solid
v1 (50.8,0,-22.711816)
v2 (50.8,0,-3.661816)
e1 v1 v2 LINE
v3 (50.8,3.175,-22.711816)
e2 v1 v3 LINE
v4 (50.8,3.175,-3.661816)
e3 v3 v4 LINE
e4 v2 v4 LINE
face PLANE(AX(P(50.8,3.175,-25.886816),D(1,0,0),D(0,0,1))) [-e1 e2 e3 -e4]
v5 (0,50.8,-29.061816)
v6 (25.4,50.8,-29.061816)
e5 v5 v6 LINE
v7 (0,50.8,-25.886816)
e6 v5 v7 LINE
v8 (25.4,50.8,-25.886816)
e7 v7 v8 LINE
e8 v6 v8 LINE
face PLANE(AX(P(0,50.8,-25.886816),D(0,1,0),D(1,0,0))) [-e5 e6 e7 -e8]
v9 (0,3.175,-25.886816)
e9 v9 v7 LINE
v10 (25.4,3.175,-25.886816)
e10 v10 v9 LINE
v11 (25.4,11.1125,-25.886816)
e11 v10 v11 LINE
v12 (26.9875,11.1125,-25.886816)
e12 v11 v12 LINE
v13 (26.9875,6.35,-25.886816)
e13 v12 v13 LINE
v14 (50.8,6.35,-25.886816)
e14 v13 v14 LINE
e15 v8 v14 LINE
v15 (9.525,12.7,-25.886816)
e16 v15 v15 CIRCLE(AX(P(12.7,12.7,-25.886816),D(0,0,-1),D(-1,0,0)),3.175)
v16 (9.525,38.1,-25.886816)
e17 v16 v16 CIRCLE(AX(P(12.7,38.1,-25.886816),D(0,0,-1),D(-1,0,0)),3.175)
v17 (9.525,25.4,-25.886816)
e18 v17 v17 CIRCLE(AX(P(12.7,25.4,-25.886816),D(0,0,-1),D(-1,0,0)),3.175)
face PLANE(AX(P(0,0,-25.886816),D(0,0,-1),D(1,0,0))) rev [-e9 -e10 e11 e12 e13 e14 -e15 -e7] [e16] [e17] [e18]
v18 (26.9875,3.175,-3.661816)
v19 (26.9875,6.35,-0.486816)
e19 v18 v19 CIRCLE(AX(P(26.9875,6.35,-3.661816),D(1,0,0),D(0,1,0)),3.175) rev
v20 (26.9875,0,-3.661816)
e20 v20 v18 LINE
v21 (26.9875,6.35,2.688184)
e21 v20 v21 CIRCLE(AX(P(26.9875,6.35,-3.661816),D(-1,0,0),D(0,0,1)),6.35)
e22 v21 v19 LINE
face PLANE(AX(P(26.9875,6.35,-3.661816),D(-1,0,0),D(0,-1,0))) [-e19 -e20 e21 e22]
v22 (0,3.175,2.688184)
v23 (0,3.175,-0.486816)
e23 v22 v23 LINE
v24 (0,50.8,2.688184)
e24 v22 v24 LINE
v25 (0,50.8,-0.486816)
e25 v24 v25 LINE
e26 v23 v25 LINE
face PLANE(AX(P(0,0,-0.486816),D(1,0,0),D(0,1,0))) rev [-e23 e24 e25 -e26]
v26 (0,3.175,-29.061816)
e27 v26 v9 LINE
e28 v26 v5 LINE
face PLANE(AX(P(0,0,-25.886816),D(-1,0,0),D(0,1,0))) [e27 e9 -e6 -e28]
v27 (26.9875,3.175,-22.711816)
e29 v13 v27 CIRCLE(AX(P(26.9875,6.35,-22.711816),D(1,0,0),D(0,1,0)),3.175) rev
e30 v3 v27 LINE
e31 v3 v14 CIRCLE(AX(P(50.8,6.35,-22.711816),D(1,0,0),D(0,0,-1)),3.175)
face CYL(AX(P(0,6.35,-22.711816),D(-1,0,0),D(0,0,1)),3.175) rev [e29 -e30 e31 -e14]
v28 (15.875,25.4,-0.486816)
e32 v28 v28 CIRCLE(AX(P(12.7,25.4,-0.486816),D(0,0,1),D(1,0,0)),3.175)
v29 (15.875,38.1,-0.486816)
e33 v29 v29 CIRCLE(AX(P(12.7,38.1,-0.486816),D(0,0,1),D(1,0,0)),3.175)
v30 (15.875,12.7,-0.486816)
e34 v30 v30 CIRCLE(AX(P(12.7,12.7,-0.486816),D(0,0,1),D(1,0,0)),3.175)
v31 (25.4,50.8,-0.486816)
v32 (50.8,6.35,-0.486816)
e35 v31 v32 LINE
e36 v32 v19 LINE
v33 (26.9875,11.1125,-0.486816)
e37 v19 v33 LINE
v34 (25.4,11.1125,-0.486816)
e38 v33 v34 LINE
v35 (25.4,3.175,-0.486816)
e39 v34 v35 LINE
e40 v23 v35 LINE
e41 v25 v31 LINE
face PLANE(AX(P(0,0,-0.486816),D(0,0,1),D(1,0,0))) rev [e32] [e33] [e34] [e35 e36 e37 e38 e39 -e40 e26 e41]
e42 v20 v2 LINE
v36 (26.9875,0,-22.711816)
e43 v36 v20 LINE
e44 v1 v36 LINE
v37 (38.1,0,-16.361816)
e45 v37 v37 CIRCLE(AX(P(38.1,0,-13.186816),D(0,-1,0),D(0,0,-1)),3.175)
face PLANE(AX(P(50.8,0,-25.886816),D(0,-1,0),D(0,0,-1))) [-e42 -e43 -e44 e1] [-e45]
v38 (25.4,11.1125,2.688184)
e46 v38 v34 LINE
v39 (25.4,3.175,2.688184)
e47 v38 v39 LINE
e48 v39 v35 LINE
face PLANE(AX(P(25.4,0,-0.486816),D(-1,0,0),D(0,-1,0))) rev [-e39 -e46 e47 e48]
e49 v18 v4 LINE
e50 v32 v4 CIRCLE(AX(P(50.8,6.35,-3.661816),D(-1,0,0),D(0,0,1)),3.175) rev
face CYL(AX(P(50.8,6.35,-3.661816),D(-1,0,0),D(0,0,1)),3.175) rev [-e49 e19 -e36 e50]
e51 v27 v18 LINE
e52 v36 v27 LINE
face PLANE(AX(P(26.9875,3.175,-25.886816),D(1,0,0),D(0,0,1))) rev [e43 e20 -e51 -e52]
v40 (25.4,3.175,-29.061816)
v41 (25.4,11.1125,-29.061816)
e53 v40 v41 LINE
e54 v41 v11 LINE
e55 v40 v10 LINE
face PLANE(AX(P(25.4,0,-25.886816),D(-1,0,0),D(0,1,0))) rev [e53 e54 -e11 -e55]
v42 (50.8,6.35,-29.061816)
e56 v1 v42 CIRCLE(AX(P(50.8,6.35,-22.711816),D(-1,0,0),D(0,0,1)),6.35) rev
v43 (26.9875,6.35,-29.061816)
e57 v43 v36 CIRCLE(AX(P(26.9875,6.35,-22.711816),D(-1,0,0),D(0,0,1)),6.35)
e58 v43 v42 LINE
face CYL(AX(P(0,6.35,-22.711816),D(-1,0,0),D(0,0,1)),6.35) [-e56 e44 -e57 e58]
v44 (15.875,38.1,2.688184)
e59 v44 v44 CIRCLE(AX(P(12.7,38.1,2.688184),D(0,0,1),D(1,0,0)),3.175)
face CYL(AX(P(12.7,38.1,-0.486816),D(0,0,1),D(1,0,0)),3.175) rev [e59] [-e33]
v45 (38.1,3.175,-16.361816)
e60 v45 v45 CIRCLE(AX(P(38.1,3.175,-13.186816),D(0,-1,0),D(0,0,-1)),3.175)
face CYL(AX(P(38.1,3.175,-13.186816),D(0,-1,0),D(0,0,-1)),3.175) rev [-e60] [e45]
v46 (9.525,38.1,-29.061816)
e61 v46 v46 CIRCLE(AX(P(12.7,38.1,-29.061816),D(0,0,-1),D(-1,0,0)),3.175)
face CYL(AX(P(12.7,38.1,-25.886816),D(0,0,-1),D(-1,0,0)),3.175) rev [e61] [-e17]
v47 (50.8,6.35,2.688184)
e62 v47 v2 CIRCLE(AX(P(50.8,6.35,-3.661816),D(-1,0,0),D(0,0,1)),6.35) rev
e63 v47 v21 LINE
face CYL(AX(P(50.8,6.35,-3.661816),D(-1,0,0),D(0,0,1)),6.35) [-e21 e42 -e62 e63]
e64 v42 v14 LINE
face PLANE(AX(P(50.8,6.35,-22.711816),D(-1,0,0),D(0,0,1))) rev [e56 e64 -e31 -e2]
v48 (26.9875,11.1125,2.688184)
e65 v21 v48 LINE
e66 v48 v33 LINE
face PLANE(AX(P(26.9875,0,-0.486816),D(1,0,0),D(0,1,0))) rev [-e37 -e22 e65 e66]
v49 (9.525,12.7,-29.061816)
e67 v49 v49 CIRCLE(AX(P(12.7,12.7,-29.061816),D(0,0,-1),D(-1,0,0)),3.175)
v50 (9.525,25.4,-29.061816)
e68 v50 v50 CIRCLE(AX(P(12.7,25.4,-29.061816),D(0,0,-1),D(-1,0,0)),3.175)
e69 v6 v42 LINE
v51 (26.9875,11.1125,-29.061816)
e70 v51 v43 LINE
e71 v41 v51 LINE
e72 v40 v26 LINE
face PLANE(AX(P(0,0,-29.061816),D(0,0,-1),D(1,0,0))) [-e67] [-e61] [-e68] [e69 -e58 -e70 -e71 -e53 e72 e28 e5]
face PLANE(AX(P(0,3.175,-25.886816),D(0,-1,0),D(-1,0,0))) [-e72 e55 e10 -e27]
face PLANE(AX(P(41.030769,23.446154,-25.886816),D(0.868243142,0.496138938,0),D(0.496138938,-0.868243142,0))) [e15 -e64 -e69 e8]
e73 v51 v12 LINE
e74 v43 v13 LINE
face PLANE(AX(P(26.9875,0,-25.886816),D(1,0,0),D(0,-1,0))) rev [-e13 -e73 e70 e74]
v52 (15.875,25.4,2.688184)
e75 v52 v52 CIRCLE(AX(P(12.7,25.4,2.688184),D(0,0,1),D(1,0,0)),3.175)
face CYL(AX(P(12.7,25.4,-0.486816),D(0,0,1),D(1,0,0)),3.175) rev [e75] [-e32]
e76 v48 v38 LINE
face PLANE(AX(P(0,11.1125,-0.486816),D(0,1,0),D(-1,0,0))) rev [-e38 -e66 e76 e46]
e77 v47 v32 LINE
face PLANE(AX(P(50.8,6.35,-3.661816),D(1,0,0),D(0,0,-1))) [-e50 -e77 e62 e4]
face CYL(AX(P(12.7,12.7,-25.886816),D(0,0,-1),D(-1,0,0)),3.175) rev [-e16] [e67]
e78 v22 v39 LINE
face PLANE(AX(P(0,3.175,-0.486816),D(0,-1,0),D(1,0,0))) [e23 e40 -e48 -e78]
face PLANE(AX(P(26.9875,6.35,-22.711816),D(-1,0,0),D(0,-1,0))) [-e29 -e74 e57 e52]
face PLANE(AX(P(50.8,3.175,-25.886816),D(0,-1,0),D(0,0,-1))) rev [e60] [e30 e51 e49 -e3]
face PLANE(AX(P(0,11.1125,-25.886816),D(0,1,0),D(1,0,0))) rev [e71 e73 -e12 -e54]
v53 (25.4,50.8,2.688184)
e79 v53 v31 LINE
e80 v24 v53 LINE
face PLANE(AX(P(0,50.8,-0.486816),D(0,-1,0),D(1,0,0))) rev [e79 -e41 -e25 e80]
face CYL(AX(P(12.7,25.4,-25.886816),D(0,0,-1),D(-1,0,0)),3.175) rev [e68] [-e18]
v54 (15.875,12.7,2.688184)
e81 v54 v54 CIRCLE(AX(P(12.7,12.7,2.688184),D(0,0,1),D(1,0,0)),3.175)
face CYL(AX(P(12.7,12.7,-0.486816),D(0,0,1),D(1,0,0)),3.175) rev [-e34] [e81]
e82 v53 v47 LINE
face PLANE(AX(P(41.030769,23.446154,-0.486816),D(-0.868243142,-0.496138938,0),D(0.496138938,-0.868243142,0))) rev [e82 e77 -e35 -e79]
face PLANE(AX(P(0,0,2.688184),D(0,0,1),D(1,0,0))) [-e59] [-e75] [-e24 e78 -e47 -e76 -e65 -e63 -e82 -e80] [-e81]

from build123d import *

# Parameters (mm, degrees)
BOSS_EXTRUDE1_START        = -0.486816485
BOSS_EXTRUDE1_DEPTH        = 3.661816485
SKETCH2_W                  = 23.8125
SKETCH2_H                  = 3.175
BOSS_EXTRUDE2_DEPTH        = 25.4
CUT_EXTRUDE1_DEPTH         = 79.943753108
CUT_EXTRUDE1_DEPTH_BACK    = 79.943753108
SKETCH3_R                  = 3.175
CUT_EXTRUDE2_DEPTH         = 76.643257039
CUT_EXTRUDE2_DEPTH_BACK    = 76.643257039
SKETCH6_R                  = 3.175
CUT_EXTRUDE3_DEPTH         = 79.943753108
CUT_EXTRUDE3_DEPTH_BACK    = 79.943753108
SKETCH7_W                  = 26.9875
SKETCH7_H                  = 3.175
FILLET1_R                  = 3.175
CONVERT_SOLID1_DEPTH       = 50.8
CONVERT_SOLID1_START       = 25.4
CONVERT_SOLID1_2_OUTLINE_W = 7.9375
CONVERT_SOLID1_2_OUTLINE_H = 3.175
CONVERT_SOLID1_2_DEPTH     = 1.5875
CONVERT_SOLID1_START_2     = 26.9875
CONVERT_SOLID1_3_DEPTH     = 23.8125
CONVERT_SOLID1_4_DEPTH     = 23.8125


# Read off the part's stored shape, not the designer's step: Convert-Solid1
with BuildPart() as part:
    # Sketch1 → Boss-Extrude1 (new body)
    with BuildSketch(Plane.XY.offset(BOSS_EXTRUDE1_START)):
        Polygon((50.8, 6.35), (25.4, 50.8), (0, 50.8), (0, 0), (50.8, 0), align=None)
    boss_extrude1 = extrude(amount=BOSS_EXTRUDE1_DEPTH)

    # Sketch2 → Boss-Extrude2 (add)
    with BuildSketch(Plane(origin=(0, 0, -0.486816485), x_dir=(-1, 0, 0), z_dir=(0, 0, -1))):
        with Locations((-38.89375, 1.5875)):
            Rectangle(SKETCH2_W, SKETCH2_H)
    extrude(amount=BOSS_EXTRUDE2_DEPTH)

    # Mirror1: Boss-Extrude1 across plane
    add(boss_extrude1.mirror(Plane(origin=(0, 0, -13.186816485), x_dir=(1, 0, 0), z_dir=(0, 0, -1))))

    # Sketch3 → Cut-Extrude1 (cut, two sides: drawn at the far end of the back side and taken through both)
    with BuildSketch(Plane.XY.offset(3.175).offset(-CUT_EXTRUDE1_DEPTH_BACK)):
        with Locations((12.7, 12.7)):
            Circle(SKETCH3_R)
        with Locations((12.7, 25.4)):
            Circle(SKETCH3_R)
        with Locations((12.7, 38.1)):
            Circle(SKETCH3_R)
    extrude(amount=CUT_EXTRUDE1_DEPTH + CUT_EXTRUDE1_DEPTH_BACK, mode=Mode.SUBTRACT)

    # Sketch6 → Cut-Extrude2 (cut, two sides: drawn at the far end of the back side and taken through both)
    with BuildSketch(Plane(origin=(0, 3.175, 0), x_dir=(1, 0, 0), z_dir=(0, 1, 0)).offset(-CUT_EXTRUDE2_DEPTH_BACK)):
        with Locations(Location((38.1, 13.186816485, 0), (0, 0, 270))):
            Circle(SKETCH6_R)
    extrude(amount=CUT_EXTRUDE2_DEPTH + CUT_EXTRUDE2_DEPTH_BACK, mode=Mode.SUBTRACT)

    # Sketch7 → Cut-Extrude3 (cut, two sides: drawn at the far end of the back side and taken through both)
    with BuildSketch(Plane(origin=(0, 0, -29.54863297), x_dir=(-1, 0, 0), z_dir=(0, 0, -1)).offset(-CUT_EXTRUDE3_DEPTH_BACK)):
        with Locations((-13.49375, 1.5875)):
            Rectangle(SKETCH7_W, SKETCH7_H)
    extrude(amount=CUT_EXTRUDE3_DEPTH + CUT_EXTRUDE3_DEPTH_BACK, mode=Mode.SUBTRACT)

    # Fillet1
    fillet1_edges = [part.edges().sort_by_distance(p)[0] for p in [
        (38.89375, 0, -29.54863297),
        (38.89375, 0, 3.175),
    ]]
    fillet(fillet1_edges, radius=FILLET1_R)

    # Convert-Solid1 outline → Convert-Solid1 (cut)
    with BuildSketch(Plane.YZ):
        with BuildLine():
            Line((50.8, -29.061816485), (3.175, -29.061816485))
            Line((3.175, -29.061816485), (3.175, -28.2110778))
            ThreePointArc((3.175, -28.2110778), (0.850738686, -25.886816486), (0, -22.711816485))
            Line((0, -22.711816485), (0, -26.37363297))
            ThreePointArc((0, -26.37363297), (0.92993597, -28.618697), (3.175, -29.54863297))
            Line((3.175, -29.54863297), (50.8, -29.54863297))
            Line((50.8, -29.54863297), (50.8, -29.061816485))
        make_face()
        with BuildLine():
            Line((0, 0), (0, -3.661816485))
            ThreePointArc((0, -3.661816485), (0.850738686, -0.486816484), (3.175, 1.83744483))
            Line((3.175, 1.83744483), (3.175, 2.688183515))
            Line((3.175, 2.688183515), (50.8, 2.688183515))
            Line((50.8, 2.688183515), (50.8, 3.175))
            Line((50.8, 3.175), (3.175, 3.175))
            ThreePointArc((3.175, 3.175), (0.92993597, 2.24506403), (0, 0))
        make_face()
    extrude(amount=CONVERT_SOLID1_DEPTH, mode=Mode.SUBTRACT)

    # Convert-Solid1 2 outline → Convert-Solid1 2 (cut)
    with BuildSketch(Plane.YZ.offset(CONVERT_SOLID1_START)):
        with Locations((7.14375, -27.474316485)):
            Rectangle(CONVERT_SOLID1_2_OUTLINE_W, CONVERT_SOLID1_2_OUTLINE_H)
        with Locations((7.14375, 1.100683515)):
            Rectangle(CONVERT_SOLID1_2_OUTLINE_W, CONVERT_SOLID1_2_OUTLINE_H)
    extrude(amount=CONVERT_SOLID1_2_DEPTH, mode=Mode.SUBTRACT)

    # Convert-Solid1 3 outline → Convert-Solid1 3 (cut)
    with BuildSketch(Plane.YZ.offset(CONVERT_SOLID1_START_2)):
        with BuildLine():
            Line((3.175, -29.061816485), (6.35, -29.061816485))
            ThreePointArc((6.35, -29.061816485), (4.706499064, -28.845445482), (3.175, -28.2110778))
            Line((3.175, -28.2110778), (3.175, -29.061816485))
        make_face()
        with BuildLine():
            Line((3.175, 2.688183515), (3.175, 1.83744483))
            ThreePointArc((3.175, 1.83744483), (4.706499064, 2.471812512), (6.35, 2.688183515))
            Line((6.35, 2.688183515), (3.175, 2.688183515))
        make_face()
    extrude(amount=CONVERT_SOLID1_3_DEPTH, mode=Mode.SUBTRACT)

    # Convert-Solid1 4 outline → Convert-Solid1 4 (add)
    with BuildSketch(Plane.YZ.offset(CONVERT_SOLID1_START_2)):
        with BuildLine():
            Line((3.175, -25.886816485), (6.35, -25.886816485))
            ThreePointArc((6.35, -25.886816485), (4.10493597, -24.956880515), (3.175, -22.711816485))
            Line((3.175, -22.711816485), (3.175, -25.886816485))
        make_face()
        with BuildLine():
            Line((3.175, -0.486816485), (3.175, -3.661816485))
            ThreePointArc((3.175, -3.661816485), (4.10493597, -1.416752455), (6.35, -0.486816485))
            Line((6.35, -0.486816485), (3.175, -0.486816485))
        make_face()
    extrude(amount=CONVERT_SOLID1_4_DEPTH)


solid = part.part
